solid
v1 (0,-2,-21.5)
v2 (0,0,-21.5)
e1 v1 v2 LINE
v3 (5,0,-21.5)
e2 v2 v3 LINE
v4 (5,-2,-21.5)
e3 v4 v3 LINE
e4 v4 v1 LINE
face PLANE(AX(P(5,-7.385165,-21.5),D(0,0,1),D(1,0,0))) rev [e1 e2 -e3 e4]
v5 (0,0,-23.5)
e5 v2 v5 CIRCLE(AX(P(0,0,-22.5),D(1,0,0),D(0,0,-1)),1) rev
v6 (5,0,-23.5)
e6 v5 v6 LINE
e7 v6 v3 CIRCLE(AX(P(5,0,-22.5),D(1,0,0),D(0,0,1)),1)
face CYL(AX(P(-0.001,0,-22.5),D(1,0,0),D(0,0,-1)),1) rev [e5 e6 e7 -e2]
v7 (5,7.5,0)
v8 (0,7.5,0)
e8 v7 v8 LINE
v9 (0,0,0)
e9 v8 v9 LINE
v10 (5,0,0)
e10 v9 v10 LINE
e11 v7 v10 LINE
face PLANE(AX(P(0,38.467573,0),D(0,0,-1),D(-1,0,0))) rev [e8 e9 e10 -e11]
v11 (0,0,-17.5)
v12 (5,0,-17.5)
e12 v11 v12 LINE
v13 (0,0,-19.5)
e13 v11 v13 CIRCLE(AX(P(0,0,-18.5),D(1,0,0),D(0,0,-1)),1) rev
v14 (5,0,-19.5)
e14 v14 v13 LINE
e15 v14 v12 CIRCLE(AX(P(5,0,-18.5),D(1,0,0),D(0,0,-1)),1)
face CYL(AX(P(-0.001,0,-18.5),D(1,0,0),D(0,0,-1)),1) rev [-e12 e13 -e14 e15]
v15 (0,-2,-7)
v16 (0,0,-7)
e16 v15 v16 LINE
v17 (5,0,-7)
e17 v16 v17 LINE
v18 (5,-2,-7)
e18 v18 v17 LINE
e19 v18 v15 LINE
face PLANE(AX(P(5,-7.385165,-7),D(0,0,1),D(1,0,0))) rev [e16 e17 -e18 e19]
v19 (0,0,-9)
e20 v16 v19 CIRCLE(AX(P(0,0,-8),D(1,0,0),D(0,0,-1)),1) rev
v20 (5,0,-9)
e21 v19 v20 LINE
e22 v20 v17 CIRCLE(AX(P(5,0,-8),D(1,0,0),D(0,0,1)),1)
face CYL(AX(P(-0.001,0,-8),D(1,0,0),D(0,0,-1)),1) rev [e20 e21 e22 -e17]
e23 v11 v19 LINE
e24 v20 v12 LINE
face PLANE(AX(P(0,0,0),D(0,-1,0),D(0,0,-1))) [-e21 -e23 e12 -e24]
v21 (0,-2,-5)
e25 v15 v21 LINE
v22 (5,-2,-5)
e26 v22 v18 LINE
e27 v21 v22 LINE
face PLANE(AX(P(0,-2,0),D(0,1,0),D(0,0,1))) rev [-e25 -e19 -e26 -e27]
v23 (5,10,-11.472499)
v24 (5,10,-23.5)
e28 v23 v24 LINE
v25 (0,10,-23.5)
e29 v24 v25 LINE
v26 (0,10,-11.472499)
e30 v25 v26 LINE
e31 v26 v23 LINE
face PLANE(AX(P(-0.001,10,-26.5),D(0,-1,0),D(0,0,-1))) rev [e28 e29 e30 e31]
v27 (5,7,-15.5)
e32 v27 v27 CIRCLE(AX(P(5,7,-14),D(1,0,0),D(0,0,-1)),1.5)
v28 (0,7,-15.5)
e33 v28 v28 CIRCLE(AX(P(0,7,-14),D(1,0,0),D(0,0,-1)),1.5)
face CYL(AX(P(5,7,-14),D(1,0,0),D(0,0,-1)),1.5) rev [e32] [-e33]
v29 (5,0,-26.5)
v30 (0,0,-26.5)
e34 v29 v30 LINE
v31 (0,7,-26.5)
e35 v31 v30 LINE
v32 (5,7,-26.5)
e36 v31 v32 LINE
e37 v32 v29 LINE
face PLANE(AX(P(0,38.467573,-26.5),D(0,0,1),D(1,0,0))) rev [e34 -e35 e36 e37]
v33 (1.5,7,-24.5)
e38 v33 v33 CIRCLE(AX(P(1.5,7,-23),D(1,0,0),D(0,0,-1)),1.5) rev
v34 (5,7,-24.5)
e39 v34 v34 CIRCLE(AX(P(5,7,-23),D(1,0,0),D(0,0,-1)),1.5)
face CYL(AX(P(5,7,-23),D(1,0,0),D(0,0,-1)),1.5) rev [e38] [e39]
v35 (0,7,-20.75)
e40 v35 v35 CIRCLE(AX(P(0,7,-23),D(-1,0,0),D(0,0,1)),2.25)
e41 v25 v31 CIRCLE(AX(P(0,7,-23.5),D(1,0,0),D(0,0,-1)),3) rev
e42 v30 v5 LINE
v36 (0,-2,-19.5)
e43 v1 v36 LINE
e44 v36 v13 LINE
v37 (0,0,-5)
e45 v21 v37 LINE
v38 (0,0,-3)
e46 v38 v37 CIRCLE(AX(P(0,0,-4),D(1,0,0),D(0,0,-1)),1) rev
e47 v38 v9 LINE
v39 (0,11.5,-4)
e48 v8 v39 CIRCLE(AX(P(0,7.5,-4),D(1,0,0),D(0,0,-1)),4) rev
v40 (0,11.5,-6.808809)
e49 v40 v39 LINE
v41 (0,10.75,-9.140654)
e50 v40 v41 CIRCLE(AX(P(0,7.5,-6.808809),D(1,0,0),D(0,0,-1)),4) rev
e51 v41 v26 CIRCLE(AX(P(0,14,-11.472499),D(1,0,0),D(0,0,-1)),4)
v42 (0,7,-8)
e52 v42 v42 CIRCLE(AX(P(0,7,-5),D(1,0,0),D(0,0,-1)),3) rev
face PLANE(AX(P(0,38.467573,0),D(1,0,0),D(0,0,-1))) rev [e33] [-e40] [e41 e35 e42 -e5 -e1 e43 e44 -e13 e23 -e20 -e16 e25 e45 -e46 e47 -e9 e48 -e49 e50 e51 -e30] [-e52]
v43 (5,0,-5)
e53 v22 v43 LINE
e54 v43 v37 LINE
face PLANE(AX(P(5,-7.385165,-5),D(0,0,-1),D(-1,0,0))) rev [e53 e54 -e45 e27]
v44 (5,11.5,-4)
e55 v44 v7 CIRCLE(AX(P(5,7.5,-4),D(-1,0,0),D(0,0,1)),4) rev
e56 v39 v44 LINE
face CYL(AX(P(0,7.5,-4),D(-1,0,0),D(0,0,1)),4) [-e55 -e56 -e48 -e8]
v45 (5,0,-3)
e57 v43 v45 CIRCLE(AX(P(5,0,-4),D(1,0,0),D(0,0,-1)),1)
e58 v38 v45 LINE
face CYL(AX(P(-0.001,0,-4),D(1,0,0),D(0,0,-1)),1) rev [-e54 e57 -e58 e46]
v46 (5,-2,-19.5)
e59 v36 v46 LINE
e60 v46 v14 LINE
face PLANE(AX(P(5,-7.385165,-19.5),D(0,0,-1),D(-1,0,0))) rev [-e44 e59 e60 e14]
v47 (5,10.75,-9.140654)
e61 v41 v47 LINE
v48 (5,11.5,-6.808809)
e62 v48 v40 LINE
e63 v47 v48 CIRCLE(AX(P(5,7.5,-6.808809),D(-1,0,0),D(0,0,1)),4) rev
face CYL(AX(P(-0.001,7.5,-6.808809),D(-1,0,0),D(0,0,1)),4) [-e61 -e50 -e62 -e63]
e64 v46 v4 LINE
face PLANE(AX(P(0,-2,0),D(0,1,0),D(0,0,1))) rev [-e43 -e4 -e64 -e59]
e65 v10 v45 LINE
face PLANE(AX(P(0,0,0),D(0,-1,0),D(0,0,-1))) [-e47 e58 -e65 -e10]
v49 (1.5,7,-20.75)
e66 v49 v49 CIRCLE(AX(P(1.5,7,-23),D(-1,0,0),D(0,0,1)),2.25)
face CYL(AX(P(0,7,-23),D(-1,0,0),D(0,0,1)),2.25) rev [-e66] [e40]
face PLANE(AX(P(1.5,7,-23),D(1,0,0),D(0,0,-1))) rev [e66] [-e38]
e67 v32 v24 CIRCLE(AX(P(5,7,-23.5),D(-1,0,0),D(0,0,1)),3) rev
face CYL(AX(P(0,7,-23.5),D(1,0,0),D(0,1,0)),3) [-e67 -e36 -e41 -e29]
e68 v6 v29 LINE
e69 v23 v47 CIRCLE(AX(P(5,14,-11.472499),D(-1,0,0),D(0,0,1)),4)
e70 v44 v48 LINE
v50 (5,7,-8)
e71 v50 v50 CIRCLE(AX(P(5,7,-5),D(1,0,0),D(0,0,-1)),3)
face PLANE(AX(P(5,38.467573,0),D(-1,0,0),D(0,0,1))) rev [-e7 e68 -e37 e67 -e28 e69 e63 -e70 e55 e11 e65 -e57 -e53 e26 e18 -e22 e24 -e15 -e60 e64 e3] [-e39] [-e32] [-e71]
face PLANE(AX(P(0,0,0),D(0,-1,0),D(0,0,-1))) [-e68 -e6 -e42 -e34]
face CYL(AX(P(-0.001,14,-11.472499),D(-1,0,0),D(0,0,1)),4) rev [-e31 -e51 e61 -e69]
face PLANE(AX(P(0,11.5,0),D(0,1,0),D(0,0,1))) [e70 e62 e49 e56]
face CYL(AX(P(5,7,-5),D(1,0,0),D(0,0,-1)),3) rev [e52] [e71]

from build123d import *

# Parameters (mm, degrees)
BASE_W                    = 5
BASE_H                    = 26.5
BODY_DEPTH                = 11.5
F_6_0MM_MOTOR_D           = 6
F_3_0MM_BEARINGS_D        = 3
WEIGHT_SAVER_REACH        = 31.317
SKETCH9_W                 = 18.15
SKETCH9_H                 = 1.5
FILLET2_R                 = 3
FILLET1_R                 = 4
FILLET4_R                 = 4
FILLET5_R                 = 4
SKETCH10_W                = 5
SKETCH10_H                = 2
MOUNTING_DEPTH            = 2
MOUNTIN_UNDERCUT_REACH    = 31.317
F_4_0MM_DOWEL_HOLE2_D     = 4.5
F_4_0MM_DOWEL_HOLE2_DEPTH = 1.5


with BuildPart() as part:
    # base → body (new body)
    with BuildSketch(Plane(origin=(0, 0, 0), x_dir=(1, 0, 0), z_dir=(0, 1, 0))):
        with Locations((2.5, 13.25)):
            Rectangle(BASE_W, BASE_H)
    extrude(amount=BODY_DEPTH)

    # Ø6.0mm motor (through all)
    with Locations(Plane(origin=(5, 0, 0), x_dir=(0, 0, -1), z_dir=(1, 0, 0))):
        with Locations((5, 7)):
            Hole(F_6_0MM_MOTOR_D / 2)

    # Ø3.0mm bearings (through all)
    with Locations(Plane(origin=(5, 0, 0), x_dir=(0, 0, -1), z_dir=(1, 0, 0))):
        with Locations((14, 7), (23, 7)):
            Hole(F_3_0MM_BEARINGS_D / 2)

    # Sketch9 → weight_saver (cut, up to next)
    with BuildSketch(Plane(origin=(5, 0, 0), x_dir=(0, 0, -1), z_dir=(1, 0, 0)), mode=Mode.PRIVATE) as weight_saver_sk1:
        with Locations((17.425, 10.75)):
            Rectangle(SKETCH9_W, SKETCH9_H)
    weight_saver_tool1 = extrude(weight_saver_sk1.sketch, amount=-WEIGHT_SAVER_REACH, mode=Mode.PRIVATE) & part.part
    add(weight_saver_tool1.solids().sort_by_distance((5, 10.75, -17.425))[0], mode=Mode.SUBTRACT)

    # Fillet2
    fillet2_edges = [part.edges().sort_by_distance(p)[0] for p in [
        (2.5, 10, -26.5),
    ]]
    fillet(fillet2_edges, radius=FILLET2_R)

    # Fillet1
    fillet1_edges = [part.edges().sort_by_distance(p)[0] for p in [
        (2.5, 11.5, 0),
    ]]
    fillet(fillet1_edges, radius=FILLET1_R)

    # Fillet4
    # the kernel refuses this fillet: 4 mm, written as the material it adds along each edge
    with BuildSketch(Plane(origin=(5, 10, -8.35), x_dir=(0, 1, 0), z_dir=(-1, 0, 0))) as fillet4_piece_1:
        with BuildLine():
            CenterArc((4, 3.122498999), FILLET4_R, 180, 51.317812547)
            Line((0, 3.122498999), (-0.08, 3.122498999))
            Line((-0.08, 3.122498999), (-0.08, 0))
            Line((-0.08, 0), (0, -0.08))
            ThreePointArc((0, -0.08), (0.75, -0.08), (1.45, -0.06244998))
            Line((1.45, -0.06244998), (1.5, 0))
        make_face()
    extrude(amount=5)

    # Fillet5
    fillet5_edges = [part.edges().sort_by_distance(p)[0] for p in [
        (2.5, 11.5, -8.35),
    ]]
    fillet(fillet5_edges, radius=FILLET5_R)

    # Sketch10 → mounting (add)
    with BuildSketch(Plane.XZ):
        with Locations((2.5, -6)):
            Rectangle(SKETCH10_W, SKETCH10_H)
        with Locations((2.5, -20.5)):
            Rectangle(SKETCH10_W, SKETCH10_H)
    extrude(amount=MOUNTING_DEPTH)

    # mounting_undercut → mountin_undercut (cut, up to next)
    with BuildSketch(Plane(origin=(5, 0, 0), x_dir=(0, 0, -1), z_dir=(1, 0, 0)), mode=Mode.PRIVATE) as mountin_undercut_sk1:
        with BuildLine():
            Line((3, 0), (5, 0))
            ThreePointArc((5, 0), (4, 1), (3, 0))
        make_face()
    mountin_undercut_tool1 = extrude(mountin_undercut_sk1.sketch, amount=-MOUNTIN_UNDERCUT_REACH, mode=Mode.PRIVATE) & part.part
    # mounting_undercut → mountin_undercut (cut, up to next)
    with BuildSketch(Plane(origin=(5, 0, 0), x_dir=(0, 0, -1), z_dir=(1, 0, 0)), mode=Mode.PRIVATE) as mountin_undercut_sk2:
        with BuildLine():
            Line((7, 0), (9, 0))
            ThreePointArc((9, 0), (8, 1), (7, 0))
        make_face()
    mountin_undercut_tool2 = extrude(mountin_undercut_sk2.sketch, amount=-MOUNTIN_UNDERCUT_REACH, mode=Mode.PRIVATE) & part.part
    # mounting_undercut → mountin_undercut (cut, up to next)
    with BuildSketch(Plane(origin=(5, 0, 0), x_dir=(0, 0, -1), z_dir=(1, 0, 0)), mode=Mode.PRIVATE) as mountin_undercut_sk3:
        with BuildLine():
            Line((17.5, 0), (19.5, 0))
            ThreePointArc((19.5, 0), (18.5, 1), (17.5, 0))
        make_face()
    mountin_undercut_tool3 = extrude(mountin_undercut_sk3.sketch, amount=-MOUNTIN_UNDERCUT_REACH, mode=Mode.PRIVATE) & part.part
    # mounting_undercut → mountin_undercut (cut, up to next)
    with BuildSketch(Plane(origin=(5, 0, 0), x_dir=(0, 0, -1), z_dir=(1, 0, 0)), mode=Mode.PRIVATE) as mountin_undercut_sk4:
        with BuildLine():
            Line((21.5, 0), (23.5, 0))
            ThreePointArc((23.5, 0), (22.5, 1), (21.5, 0))
        make_face()
    mountin_undercut_tool4 = extrude(mountin_undercut_sk4.sketch, amount=-MOUNTIN_UNDERCUT_REACH, mode=Mode.PRIVATE) & part.part
    add(mountin_undercut_tool1.solids().sort_by_distance((5, 0.424413, -4))[0], mode=Mode.SUBTRACT)
    add(mountin_undercut_tool2.solids().sort_by_distance((5, 0.424413, -8))[0], mode=Mode.SUBTRACT)
    add(mountin_undercut_tool3.solids().sort_by_distance((5, 0.424413, -18.5))[0], mode=Mode.SUBTRACT)
    add(mountin_undercut_tool4.solids().sort_by_distance((5, 0.424413, -22.5))[0], mode=Mode.SUBTRACT)

    # Ø4.0mm Dowel Hole2
    with Locations(Plane.ZY):
        with Locations((-23, 7)):
            Hole(F_4_0MM_DOWEL_HOLE2_D / 2, depth=F_4_0MM_DOWEL_HOLE2_DEPTH)


solid = part.part
